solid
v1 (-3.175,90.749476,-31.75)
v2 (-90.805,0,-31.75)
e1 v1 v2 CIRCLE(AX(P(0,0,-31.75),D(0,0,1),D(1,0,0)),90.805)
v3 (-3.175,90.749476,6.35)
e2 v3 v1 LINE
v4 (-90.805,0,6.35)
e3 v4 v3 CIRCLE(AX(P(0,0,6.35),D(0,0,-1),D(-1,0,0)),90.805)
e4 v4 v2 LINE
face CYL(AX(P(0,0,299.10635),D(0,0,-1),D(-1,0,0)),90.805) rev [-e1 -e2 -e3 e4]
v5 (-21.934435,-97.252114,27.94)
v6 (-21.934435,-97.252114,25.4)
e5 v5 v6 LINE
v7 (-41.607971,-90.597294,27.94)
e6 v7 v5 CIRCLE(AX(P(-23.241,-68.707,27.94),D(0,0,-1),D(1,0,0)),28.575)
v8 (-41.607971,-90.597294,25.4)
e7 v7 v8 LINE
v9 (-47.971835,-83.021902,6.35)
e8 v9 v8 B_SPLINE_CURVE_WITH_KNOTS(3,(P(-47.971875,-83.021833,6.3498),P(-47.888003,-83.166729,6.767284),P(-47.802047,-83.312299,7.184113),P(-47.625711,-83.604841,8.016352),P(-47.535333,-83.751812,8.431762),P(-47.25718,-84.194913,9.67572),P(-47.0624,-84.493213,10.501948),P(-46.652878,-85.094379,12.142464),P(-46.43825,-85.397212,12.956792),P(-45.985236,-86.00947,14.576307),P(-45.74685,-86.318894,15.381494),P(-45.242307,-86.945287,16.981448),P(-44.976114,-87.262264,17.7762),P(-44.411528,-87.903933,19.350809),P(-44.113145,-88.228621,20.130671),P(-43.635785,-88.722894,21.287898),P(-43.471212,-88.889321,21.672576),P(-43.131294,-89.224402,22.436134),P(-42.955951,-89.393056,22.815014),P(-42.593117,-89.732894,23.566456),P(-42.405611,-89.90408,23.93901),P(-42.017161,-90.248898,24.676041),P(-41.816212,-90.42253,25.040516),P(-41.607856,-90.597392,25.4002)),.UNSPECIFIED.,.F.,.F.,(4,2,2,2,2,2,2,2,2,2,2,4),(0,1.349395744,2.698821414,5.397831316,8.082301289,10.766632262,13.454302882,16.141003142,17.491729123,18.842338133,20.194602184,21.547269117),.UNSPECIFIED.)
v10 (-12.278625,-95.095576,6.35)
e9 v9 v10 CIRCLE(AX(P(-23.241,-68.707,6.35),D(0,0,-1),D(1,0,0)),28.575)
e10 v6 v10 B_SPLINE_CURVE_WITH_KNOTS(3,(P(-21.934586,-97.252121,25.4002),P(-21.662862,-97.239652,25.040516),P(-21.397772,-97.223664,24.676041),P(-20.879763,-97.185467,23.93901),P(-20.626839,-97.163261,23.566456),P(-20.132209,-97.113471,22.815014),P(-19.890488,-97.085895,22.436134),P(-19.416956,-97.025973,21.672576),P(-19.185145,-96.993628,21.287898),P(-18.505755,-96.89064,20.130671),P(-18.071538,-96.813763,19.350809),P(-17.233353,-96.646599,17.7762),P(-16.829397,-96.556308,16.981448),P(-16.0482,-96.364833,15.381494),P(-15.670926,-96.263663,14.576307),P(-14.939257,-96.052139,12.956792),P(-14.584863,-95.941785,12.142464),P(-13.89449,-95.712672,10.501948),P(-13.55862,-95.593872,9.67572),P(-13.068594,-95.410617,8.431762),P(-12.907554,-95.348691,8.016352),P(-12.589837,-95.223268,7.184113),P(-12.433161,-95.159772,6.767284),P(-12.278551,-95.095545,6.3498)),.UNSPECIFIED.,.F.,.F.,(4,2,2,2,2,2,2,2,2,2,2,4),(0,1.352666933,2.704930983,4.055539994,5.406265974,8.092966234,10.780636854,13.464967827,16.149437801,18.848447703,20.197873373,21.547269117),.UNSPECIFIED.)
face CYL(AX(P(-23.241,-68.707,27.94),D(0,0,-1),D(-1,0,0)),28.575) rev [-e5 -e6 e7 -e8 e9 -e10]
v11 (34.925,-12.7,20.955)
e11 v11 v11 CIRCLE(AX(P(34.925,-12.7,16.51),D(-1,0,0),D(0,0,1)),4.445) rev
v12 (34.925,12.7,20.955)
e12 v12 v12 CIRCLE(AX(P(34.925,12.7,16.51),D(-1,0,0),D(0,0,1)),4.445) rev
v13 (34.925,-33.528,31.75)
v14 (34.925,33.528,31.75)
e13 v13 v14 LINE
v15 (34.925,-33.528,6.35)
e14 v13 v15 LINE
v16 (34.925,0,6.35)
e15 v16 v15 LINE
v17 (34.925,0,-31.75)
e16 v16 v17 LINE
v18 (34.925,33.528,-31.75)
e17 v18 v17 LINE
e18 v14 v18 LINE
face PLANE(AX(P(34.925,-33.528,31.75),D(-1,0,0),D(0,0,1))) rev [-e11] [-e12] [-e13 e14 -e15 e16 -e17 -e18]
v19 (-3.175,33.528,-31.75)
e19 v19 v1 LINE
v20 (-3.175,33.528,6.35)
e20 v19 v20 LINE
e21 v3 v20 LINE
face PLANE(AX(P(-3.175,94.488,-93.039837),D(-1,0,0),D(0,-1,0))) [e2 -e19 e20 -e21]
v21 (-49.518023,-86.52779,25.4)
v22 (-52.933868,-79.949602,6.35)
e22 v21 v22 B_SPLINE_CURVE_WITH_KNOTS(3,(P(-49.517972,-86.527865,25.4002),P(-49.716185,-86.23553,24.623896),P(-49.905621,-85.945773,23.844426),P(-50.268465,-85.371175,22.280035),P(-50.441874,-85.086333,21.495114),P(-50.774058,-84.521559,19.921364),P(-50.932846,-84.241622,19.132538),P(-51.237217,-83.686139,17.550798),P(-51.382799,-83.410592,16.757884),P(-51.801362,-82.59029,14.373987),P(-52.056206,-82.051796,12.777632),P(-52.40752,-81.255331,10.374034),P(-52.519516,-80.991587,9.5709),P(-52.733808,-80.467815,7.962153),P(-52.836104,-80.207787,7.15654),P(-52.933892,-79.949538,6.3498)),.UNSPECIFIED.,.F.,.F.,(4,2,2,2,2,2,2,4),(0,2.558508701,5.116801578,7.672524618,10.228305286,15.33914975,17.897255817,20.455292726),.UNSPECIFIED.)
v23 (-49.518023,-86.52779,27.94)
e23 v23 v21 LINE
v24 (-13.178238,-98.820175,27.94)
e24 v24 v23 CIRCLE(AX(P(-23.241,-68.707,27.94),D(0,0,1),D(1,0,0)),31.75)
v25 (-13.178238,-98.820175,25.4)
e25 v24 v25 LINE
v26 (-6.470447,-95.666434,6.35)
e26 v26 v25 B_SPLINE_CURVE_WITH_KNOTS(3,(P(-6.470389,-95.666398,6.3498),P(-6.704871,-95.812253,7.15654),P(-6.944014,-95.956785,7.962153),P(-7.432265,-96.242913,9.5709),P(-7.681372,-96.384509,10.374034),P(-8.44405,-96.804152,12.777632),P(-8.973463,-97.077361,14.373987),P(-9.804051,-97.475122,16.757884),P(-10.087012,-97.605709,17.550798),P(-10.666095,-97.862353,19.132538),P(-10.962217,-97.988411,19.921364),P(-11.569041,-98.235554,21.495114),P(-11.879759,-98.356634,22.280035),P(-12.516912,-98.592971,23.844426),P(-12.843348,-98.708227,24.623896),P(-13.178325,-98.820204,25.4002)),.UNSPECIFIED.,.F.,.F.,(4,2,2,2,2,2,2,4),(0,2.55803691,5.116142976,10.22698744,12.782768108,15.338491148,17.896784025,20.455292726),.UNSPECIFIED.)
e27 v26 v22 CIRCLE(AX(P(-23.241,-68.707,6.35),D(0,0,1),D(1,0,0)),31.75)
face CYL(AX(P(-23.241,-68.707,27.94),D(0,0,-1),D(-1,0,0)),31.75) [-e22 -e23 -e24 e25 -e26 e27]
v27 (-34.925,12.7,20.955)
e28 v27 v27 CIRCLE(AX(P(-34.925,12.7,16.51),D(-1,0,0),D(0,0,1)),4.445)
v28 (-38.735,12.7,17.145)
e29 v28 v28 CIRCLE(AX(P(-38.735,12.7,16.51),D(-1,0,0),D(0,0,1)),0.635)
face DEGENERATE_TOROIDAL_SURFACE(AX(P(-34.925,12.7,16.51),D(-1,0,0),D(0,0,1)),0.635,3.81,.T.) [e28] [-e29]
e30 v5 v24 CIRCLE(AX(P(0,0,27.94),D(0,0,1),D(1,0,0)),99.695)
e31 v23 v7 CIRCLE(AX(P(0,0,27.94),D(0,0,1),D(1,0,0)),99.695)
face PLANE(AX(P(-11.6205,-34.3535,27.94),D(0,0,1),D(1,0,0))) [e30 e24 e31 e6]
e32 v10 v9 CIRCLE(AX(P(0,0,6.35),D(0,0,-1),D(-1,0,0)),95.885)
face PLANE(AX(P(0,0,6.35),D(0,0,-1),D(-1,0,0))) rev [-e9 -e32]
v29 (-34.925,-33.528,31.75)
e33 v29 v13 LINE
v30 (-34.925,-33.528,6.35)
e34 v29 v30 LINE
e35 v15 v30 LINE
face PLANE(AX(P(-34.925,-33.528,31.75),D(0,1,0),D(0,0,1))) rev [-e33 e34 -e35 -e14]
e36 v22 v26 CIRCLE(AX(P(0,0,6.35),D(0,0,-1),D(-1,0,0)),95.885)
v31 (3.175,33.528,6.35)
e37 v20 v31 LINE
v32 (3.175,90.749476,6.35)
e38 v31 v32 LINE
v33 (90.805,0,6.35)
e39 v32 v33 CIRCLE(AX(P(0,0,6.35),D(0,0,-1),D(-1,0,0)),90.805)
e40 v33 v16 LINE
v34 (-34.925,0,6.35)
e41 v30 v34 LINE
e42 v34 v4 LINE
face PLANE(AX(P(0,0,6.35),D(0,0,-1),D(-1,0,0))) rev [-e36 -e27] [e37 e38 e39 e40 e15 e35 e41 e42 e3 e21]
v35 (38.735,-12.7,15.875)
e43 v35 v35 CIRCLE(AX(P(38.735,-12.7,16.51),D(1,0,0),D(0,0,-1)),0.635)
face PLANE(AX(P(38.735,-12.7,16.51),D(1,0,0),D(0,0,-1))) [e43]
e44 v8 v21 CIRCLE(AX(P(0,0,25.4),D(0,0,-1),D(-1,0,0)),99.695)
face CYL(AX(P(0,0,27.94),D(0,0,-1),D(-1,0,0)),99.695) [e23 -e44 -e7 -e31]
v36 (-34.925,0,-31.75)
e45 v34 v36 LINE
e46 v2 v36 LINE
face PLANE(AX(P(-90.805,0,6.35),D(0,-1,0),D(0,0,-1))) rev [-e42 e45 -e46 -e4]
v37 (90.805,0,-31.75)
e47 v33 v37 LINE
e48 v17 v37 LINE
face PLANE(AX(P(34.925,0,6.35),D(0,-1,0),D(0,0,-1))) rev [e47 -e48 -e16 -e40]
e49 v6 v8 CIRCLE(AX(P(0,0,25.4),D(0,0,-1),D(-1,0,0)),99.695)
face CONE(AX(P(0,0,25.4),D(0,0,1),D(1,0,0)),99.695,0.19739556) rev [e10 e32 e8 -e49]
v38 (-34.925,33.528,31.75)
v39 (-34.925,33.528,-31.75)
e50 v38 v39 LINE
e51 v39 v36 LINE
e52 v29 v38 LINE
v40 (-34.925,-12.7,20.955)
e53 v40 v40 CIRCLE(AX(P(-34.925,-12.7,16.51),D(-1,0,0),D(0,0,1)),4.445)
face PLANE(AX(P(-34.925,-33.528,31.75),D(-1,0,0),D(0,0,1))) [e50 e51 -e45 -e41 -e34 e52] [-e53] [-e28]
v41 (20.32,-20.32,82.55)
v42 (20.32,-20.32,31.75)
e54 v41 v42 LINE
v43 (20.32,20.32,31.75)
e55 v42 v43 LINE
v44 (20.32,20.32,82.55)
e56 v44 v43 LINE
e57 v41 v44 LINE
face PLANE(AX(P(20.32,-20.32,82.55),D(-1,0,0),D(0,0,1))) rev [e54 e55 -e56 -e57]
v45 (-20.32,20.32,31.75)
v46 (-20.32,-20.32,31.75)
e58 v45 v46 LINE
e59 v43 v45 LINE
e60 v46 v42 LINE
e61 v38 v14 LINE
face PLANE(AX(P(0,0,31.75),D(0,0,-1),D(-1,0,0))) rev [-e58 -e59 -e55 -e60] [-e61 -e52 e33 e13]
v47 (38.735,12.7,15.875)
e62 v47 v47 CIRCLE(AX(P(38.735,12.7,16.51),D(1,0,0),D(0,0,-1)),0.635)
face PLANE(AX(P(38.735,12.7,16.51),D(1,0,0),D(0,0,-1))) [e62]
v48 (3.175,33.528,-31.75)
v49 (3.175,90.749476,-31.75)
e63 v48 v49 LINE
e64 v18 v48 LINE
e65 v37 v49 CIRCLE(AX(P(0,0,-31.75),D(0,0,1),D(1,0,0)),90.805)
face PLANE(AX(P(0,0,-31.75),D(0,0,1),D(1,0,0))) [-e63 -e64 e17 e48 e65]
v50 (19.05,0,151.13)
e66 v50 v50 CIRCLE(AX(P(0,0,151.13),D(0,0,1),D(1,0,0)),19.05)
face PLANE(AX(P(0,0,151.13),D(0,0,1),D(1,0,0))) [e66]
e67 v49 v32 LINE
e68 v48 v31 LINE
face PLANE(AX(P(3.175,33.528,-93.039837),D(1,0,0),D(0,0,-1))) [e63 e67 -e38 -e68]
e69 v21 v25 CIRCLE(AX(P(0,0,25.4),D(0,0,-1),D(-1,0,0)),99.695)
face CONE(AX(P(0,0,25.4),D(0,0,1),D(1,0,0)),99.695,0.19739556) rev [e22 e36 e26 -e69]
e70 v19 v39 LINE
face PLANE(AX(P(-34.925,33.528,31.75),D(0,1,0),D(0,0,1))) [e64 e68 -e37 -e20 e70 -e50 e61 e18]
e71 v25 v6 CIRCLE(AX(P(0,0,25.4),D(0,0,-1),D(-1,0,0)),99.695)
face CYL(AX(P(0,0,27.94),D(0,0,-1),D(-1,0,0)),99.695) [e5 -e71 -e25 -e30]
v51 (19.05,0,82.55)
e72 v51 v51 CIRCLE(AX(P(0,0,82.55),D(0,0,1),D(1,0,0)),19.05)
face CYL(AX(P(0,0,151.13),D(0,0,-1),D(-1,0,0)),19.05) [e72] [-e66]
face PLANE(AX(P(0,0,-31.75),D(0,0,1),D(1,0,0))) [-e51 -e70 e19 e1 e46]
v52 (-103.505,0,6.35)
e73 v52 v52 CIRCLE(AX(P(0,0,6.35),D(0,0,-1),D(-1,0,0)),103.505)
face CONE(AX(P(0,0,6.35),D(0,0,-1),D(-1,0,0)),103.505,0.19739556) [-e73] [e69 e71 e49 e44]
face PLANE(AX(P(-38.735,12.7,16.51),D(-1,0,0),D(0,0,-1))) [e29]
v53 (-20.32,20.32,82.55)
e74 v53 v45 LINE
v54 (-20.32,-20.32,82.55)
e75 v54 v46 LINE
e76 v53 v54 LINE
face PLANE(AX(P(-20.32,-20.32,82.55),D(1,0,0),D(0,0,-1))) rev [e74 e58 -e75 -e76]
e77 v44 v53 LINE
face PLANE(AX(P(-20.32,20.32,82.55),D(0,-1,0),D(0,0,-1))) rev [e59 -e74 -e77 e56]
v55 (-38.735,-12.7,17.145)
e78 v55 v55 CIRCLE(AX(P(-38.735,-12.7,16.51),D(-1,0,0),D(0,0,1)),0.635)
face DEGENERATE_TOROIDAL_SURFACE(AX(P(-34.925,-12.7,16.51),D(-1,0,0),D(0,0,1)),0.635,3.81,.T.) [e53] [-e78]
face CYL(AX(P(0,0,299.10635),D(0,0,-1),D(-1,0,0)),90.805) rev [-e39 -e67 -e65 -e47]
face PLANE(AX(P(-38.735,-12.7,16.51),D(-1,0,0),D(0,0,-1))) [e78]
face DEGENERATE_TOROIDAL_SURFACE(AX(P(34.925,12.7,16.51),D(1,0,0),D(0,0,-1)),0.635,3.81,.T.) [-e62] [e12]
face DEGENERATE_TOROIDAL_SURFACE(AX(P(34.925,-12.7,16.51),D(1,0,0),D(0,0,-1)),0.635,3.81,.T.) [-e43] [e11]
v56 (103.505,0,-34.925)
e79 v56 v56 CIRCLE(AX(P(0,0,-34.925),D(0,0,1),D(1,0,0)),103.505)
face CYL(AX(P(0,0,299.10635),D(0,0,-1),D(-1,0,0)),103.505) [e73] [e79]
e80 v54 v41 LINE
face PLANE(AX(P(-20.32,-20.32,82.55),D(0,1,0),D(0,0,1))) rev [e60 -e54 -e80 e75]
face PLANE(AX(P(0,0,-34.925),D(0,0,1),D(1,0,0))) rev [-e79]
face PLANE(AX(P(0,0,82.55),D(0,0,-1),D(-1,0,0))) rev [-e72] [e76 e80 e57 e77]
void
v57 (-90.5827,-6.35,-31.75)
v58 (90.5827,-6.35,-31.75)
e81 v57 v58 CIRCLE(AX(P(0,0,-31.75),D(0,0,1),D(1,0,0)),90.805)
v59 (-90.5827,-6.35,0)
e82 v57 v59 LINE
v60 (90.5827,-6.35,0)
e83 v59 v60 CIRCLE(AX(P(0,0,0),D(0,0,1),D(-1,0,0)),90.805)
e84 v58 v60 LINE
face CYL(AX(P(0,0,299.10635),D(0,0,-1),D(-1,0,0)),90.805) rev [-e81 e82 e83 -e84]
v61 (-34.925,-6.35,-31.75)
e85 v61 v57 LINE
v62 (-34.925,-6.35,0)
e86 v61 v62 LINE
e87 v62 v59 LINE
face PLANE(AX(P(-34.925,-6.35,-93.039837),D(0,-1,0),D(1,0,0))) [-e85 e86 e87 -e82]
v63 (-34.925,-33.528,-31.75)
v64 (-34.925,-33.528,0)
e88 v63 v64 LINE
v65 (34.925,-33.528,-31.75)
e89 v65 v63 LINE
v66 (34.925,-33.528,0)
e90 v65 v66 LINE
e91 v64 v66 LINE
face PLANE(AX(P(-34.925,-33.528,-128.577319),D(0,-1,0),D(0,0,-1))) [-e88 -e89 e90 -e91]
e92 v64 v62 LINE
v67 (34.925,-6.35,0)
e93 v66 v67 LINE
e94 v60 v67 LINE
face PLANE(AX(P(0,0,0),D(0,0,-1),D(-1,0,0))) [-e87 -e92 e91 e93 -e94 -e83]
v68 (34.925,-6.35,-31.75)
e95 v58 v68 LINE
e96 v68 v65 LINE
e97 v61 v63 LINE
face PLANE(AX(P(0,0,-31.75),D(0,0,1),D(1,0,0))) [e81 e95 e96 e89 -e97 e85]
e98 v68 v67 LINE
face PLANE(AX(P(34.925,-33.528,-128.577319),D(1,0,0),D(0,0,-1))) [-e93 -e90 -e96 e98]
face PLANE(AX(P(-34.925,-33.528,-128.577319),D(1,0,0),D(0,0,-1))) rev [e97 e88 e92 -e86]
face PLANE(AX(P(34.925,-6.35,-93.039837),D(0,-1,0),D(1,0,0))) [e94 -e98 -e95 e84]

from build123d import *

# Parameters (mm, degrees)
BOSS_EXTRUDE1_DEPTH  = 6.35
SKETCH1_W            = 69.85
SKETCH1_H            = 67.056
BOSS_EXTRUDE2_DEPTH  = 31.75
SKETCH3_R            = 103.505
SKETCH3_R_2          = 90.805
BOSS_EXTRUDE3_DEPTH  = 38.1
BOSS_EXTRUDE4_START  = -3.175
SKETCH3_2_R          = 103.505
BOSS_EXTRUDE4_DEPTH  = 3.175
BOSS_EXTRUDE5_REACH  = 154.086
SKETCH1_3_W          = 69.85
SKETCH1_3_H          = 67.056
BOSS_EXTRUDE6_DEPTH  = 31.75
BOSS_EXTRUDE7_DEPTH  = 21.59
SKETCH8_R            = 4.445
BOSS_EXTRUDE8_DEPTH  = 3.81
FILLET1_R            = 3.81
FILLET1_OF_MIRROR3_R = 3.81
SKETCH9_W            = 40.64
SKETCH9_H            = 40.64
BOSS_EXTRUDE9_DEPTH  = 50.8
SKETCH10_R           = 19.05
BOSS_EXTRUDE10_DEPTH = 68.58


with BuildPart() as part:
    # Sketch2 → Boss-Extrude1 (new body)
    with BuildSketch(Plane.XY):
        with BuildLine():
            Line((-90.805, 0), (-34.925, 0))
            Line((-34.925, 0), (-34.925, -33.528))
            Line((-34.925, -33.528), (34.925, -33.528))
            Line((34.925, -33.528), (34.925, 0))
            Line((34.925, 0), (90.805, 0))
            ThreePointArc((90.805, 0), (0, -90.805), (-90.805, 0))
        make_face()
    extrude(amount=BOSS_EXTRUDE1_DEPTH)

    # Sketch1 → Boss-Extrude2 (add)
    with BuildSketch(Plane.XY):
        Rectangle(SKETCH1_W, SKETCH1_H)
    extrude(amount=BOSS_EXTRUDE2_DEPTH)

    # Sketch3 → Boss-Extrude3 (add)
    with BuildSketch(Plane.XY.offset(-31.75)):
        with Locations(Location((0, 0, 0), (0, 0, 180))):
            Circle(SKETCH3_R)
        Circle(SKETCH3_R_2, mode=Mode.SUBTRACT)
    extrude(amount=BOSS_EXTRUDE3_DEPTH)

    # Sketch3<2> → Boss-Extrude4 (add)
    with BuildSketch(Plane.XY.offset(-31.75).offset(BOSS_EXTRUDE4_START)):
        with Locations(Location((0, 0, 0), (0, 0, 180))):
            Circle(SKETCH3_2_R)
    extrude(amount=BOSS_EXTRUDE4_DEPTH)

    # Boss-Extrude5: up to this face of the body (flat: up to its plane)
    boss_extrude5_end = Plane(part.part.faces().sort_by_distance((0, 0, -31.75))[0])
    # Sketch5 → Boss-Extrude5 (add, up to the picked face)
    with BuildSketch(Plane.XY.offset(6.35), mode=Mode.PRIVATE) as boss_extrude5_sk1:
        with BuildLine():
            Line((-90.805, 0), (-34.925, 0))
            Line((-34.925, 0), (-34.925, -6.35))
            Line((-34.925, -6.35), (-90.582699921, -6.35))
            ThreePointArc((-90.582699921, -6.35), (-90.749407963, -3.176944968), (-90.805, 0))
        make_face()
    boss_extrude5_tool1 = split(extrude(boss_extrude5_sk1.sketch, amount=-BOSS_EXTRUDE5_REACH, mode=Mode.PRIVATE), bisect_by=boss_extrude5_end, keep=Keep.BOTH, mode=Mode.PRIVATE)
    # Sketch5 → Boss-Extrude5 (add, up to the picked face)
    with BuildSketch(Plane.XY.offset(6.35), mode=Mode.PRIVATE) as boss_extrude5_sk2:
        with BuildLine():
            Line((34.925, 0), (90.805, 0))
            ThreePointArc((90.805, 0), (90.749407963, -3.176944968), (90.582699921, -6.35))
            Line((90.582699921, -6.35), (34.925, -6.35))
            Line((34.925, -6.35), (34.925, 0))
        make_face()
    boss_extrude5_tool2 = split(extrude(boss_extrude5_sk2.sketch, amount=-BOSS_EXTRUDE5_REACH, mode=Mode.PRIVATE), bisect_by=boss_extrude5_end, keep=Keep.BOTH, mode=Mode.PRIVATE)
    # Sketch5 → Boss-Extrude5 (add, up to the picked face)
    with BuildSketch(Plane.XY.offset(6.35), mode=Mode.PRIVATE) as boss_extrude5_sk3:
        Polygon((0, 33.528), (3.175, 33.528), (3.175, 94.488), (-3.175, 94.488), (-3.175, 33.528), align=None)
    boss_extrude5_tool3 = split(extrude(boss_extrude5_sk3.sketch, amount=-BOSS_EXTRUDE5_REACH, mode=Mode.PRIVATE), bisect_by=boss_extrude5_end, keep=Keep.BOTH, mode=Mode.PRIVATE)
    add(boss_extrude5_tool1.solids().sort_by(Axis((-62.828007, -3.172893, 6.35), (0, 0, -1)))[0])
    add(boss_extrude5_tool2.solids().sort_by(Axis((62.828007, -3.172893, 6.35), (0, 0, -1)))[0])
    add(boss_extrude5_tool3.solids().sort_by(Axis((0, 64.008, 6.35), (0, 0, -1)))[0])

    # Sketch1<3> → Boss-Extrude6 (add)
    with BuildSketch(Plane.XY):
        Rectangle(SKETCH1_3_W, SKETCH1_3_H)
    extrude(amount=-BOSS_EXTRUDE6_DEPTH)

    # Sketch6 → Revolve1 (revolve)
    with BuildSketch(Plane(origin=(0, 0, 0), x_dir=(1, 0, 0), z_dir=(0, 1, 0))):
        Polygon((-103.505, -6.35), (-99.695, -25.4), (-95.885, -6.35), align=None)
    revolve(axis=Axis((0, 0, 0), (0, 0, 1)))

    # Sketch7 → Boss-Extrude7 (add)
    with BuildSketch(Plane.XY.offset(6.35)):
        with BuildLine():
            ThreePointArc((-13.17823844, -98.820175352), (-13.067443237, -38.631075363), (-49.51802331, -86.527789712))
            ThreePointArc((-49.51802331, -86.527789712), (-45.608408723, -88.650809803), (-41.607971429, -90.597294323))
            ThreePointArc((-41.607971429, -90.597294323), (-14.084798914, -41.638667826), (-21.934434586, -97.252113624))
            ThreePointArc((-21.934434586, -97.252113624), (-17.573834418, -98.133854346), (-13.17823844, -98.820175352))
        make_face()
    extrude(amount=BOSS_EXTRUDE7_DEPTH)

    # Sketch8 → Boss-Extrude8 (add)
    with BuildSketch(Plane(origin=(34.925, 0, 0), x_dir=(0, 0, -1), z_dir=(1, 0, 0))):
        with Locations(Location((-16.51, 12.7, 0), (0, 0, 180))):
            Circle(SKETCH8_R)
        with Locations(Location((-16.51, -12.7, 0), (0, 0, 180))):
            Circle(SKETCH8_R)
    boss_extrude8 = extrude(amount=BOSS_EXTRUDE8_DEPTH)

    # Fillet1
    fillet1_edges = [part.edges().sort_by_distance(p)[0] for p in [
        (38.735, 12.7, 12.065),
        (38.735, -12.7, 12.065),
    ]]
    fillet(fillet1_edges, radius=FILLET1_R - 0.0001)  # a hair under: the kernel refuses the full size

    # Mirror3: Boss-Extrude8 across plane
    add(boss_extrude8.mirror(Plane(origin=(0, 0, 0), x_dir=(0, 0, 1), z_dir=(1, 0, 0))))

    # Fillet1 of Mirror3
    fillet1_of_mirror3_edges = [part.edges().sort_by_distance(p)[0] for p in [
        (-38.735, 12.7, 12.065),
        (-38.735, -12.7, 12.065),
    ]]
    fillet(fillet1_of_mirror3_edges, radius=FILLET1_OF_MIRROR3_R - 0.0001)  # a hair under: the kernel refuses the full size

    # Sketch9 → Boss-Extrude9 (add)
    with BuildSketch(Plane.XY.offset(31.75)):
        Rectangle(SKETCH9_W, SKETCH9_H)
    extrude(amount=BOSS_EXTRUDE9_DEPTH)

    # Sketch10 → Boss-Extrude10 (add)
    with BuildSketch(Plane.XY.offset(82.55)):
        Circle(SKETCH10_R)
    extrude(amount=BOSS_EXTRUDE10_DEPTH)


solid = part.part
